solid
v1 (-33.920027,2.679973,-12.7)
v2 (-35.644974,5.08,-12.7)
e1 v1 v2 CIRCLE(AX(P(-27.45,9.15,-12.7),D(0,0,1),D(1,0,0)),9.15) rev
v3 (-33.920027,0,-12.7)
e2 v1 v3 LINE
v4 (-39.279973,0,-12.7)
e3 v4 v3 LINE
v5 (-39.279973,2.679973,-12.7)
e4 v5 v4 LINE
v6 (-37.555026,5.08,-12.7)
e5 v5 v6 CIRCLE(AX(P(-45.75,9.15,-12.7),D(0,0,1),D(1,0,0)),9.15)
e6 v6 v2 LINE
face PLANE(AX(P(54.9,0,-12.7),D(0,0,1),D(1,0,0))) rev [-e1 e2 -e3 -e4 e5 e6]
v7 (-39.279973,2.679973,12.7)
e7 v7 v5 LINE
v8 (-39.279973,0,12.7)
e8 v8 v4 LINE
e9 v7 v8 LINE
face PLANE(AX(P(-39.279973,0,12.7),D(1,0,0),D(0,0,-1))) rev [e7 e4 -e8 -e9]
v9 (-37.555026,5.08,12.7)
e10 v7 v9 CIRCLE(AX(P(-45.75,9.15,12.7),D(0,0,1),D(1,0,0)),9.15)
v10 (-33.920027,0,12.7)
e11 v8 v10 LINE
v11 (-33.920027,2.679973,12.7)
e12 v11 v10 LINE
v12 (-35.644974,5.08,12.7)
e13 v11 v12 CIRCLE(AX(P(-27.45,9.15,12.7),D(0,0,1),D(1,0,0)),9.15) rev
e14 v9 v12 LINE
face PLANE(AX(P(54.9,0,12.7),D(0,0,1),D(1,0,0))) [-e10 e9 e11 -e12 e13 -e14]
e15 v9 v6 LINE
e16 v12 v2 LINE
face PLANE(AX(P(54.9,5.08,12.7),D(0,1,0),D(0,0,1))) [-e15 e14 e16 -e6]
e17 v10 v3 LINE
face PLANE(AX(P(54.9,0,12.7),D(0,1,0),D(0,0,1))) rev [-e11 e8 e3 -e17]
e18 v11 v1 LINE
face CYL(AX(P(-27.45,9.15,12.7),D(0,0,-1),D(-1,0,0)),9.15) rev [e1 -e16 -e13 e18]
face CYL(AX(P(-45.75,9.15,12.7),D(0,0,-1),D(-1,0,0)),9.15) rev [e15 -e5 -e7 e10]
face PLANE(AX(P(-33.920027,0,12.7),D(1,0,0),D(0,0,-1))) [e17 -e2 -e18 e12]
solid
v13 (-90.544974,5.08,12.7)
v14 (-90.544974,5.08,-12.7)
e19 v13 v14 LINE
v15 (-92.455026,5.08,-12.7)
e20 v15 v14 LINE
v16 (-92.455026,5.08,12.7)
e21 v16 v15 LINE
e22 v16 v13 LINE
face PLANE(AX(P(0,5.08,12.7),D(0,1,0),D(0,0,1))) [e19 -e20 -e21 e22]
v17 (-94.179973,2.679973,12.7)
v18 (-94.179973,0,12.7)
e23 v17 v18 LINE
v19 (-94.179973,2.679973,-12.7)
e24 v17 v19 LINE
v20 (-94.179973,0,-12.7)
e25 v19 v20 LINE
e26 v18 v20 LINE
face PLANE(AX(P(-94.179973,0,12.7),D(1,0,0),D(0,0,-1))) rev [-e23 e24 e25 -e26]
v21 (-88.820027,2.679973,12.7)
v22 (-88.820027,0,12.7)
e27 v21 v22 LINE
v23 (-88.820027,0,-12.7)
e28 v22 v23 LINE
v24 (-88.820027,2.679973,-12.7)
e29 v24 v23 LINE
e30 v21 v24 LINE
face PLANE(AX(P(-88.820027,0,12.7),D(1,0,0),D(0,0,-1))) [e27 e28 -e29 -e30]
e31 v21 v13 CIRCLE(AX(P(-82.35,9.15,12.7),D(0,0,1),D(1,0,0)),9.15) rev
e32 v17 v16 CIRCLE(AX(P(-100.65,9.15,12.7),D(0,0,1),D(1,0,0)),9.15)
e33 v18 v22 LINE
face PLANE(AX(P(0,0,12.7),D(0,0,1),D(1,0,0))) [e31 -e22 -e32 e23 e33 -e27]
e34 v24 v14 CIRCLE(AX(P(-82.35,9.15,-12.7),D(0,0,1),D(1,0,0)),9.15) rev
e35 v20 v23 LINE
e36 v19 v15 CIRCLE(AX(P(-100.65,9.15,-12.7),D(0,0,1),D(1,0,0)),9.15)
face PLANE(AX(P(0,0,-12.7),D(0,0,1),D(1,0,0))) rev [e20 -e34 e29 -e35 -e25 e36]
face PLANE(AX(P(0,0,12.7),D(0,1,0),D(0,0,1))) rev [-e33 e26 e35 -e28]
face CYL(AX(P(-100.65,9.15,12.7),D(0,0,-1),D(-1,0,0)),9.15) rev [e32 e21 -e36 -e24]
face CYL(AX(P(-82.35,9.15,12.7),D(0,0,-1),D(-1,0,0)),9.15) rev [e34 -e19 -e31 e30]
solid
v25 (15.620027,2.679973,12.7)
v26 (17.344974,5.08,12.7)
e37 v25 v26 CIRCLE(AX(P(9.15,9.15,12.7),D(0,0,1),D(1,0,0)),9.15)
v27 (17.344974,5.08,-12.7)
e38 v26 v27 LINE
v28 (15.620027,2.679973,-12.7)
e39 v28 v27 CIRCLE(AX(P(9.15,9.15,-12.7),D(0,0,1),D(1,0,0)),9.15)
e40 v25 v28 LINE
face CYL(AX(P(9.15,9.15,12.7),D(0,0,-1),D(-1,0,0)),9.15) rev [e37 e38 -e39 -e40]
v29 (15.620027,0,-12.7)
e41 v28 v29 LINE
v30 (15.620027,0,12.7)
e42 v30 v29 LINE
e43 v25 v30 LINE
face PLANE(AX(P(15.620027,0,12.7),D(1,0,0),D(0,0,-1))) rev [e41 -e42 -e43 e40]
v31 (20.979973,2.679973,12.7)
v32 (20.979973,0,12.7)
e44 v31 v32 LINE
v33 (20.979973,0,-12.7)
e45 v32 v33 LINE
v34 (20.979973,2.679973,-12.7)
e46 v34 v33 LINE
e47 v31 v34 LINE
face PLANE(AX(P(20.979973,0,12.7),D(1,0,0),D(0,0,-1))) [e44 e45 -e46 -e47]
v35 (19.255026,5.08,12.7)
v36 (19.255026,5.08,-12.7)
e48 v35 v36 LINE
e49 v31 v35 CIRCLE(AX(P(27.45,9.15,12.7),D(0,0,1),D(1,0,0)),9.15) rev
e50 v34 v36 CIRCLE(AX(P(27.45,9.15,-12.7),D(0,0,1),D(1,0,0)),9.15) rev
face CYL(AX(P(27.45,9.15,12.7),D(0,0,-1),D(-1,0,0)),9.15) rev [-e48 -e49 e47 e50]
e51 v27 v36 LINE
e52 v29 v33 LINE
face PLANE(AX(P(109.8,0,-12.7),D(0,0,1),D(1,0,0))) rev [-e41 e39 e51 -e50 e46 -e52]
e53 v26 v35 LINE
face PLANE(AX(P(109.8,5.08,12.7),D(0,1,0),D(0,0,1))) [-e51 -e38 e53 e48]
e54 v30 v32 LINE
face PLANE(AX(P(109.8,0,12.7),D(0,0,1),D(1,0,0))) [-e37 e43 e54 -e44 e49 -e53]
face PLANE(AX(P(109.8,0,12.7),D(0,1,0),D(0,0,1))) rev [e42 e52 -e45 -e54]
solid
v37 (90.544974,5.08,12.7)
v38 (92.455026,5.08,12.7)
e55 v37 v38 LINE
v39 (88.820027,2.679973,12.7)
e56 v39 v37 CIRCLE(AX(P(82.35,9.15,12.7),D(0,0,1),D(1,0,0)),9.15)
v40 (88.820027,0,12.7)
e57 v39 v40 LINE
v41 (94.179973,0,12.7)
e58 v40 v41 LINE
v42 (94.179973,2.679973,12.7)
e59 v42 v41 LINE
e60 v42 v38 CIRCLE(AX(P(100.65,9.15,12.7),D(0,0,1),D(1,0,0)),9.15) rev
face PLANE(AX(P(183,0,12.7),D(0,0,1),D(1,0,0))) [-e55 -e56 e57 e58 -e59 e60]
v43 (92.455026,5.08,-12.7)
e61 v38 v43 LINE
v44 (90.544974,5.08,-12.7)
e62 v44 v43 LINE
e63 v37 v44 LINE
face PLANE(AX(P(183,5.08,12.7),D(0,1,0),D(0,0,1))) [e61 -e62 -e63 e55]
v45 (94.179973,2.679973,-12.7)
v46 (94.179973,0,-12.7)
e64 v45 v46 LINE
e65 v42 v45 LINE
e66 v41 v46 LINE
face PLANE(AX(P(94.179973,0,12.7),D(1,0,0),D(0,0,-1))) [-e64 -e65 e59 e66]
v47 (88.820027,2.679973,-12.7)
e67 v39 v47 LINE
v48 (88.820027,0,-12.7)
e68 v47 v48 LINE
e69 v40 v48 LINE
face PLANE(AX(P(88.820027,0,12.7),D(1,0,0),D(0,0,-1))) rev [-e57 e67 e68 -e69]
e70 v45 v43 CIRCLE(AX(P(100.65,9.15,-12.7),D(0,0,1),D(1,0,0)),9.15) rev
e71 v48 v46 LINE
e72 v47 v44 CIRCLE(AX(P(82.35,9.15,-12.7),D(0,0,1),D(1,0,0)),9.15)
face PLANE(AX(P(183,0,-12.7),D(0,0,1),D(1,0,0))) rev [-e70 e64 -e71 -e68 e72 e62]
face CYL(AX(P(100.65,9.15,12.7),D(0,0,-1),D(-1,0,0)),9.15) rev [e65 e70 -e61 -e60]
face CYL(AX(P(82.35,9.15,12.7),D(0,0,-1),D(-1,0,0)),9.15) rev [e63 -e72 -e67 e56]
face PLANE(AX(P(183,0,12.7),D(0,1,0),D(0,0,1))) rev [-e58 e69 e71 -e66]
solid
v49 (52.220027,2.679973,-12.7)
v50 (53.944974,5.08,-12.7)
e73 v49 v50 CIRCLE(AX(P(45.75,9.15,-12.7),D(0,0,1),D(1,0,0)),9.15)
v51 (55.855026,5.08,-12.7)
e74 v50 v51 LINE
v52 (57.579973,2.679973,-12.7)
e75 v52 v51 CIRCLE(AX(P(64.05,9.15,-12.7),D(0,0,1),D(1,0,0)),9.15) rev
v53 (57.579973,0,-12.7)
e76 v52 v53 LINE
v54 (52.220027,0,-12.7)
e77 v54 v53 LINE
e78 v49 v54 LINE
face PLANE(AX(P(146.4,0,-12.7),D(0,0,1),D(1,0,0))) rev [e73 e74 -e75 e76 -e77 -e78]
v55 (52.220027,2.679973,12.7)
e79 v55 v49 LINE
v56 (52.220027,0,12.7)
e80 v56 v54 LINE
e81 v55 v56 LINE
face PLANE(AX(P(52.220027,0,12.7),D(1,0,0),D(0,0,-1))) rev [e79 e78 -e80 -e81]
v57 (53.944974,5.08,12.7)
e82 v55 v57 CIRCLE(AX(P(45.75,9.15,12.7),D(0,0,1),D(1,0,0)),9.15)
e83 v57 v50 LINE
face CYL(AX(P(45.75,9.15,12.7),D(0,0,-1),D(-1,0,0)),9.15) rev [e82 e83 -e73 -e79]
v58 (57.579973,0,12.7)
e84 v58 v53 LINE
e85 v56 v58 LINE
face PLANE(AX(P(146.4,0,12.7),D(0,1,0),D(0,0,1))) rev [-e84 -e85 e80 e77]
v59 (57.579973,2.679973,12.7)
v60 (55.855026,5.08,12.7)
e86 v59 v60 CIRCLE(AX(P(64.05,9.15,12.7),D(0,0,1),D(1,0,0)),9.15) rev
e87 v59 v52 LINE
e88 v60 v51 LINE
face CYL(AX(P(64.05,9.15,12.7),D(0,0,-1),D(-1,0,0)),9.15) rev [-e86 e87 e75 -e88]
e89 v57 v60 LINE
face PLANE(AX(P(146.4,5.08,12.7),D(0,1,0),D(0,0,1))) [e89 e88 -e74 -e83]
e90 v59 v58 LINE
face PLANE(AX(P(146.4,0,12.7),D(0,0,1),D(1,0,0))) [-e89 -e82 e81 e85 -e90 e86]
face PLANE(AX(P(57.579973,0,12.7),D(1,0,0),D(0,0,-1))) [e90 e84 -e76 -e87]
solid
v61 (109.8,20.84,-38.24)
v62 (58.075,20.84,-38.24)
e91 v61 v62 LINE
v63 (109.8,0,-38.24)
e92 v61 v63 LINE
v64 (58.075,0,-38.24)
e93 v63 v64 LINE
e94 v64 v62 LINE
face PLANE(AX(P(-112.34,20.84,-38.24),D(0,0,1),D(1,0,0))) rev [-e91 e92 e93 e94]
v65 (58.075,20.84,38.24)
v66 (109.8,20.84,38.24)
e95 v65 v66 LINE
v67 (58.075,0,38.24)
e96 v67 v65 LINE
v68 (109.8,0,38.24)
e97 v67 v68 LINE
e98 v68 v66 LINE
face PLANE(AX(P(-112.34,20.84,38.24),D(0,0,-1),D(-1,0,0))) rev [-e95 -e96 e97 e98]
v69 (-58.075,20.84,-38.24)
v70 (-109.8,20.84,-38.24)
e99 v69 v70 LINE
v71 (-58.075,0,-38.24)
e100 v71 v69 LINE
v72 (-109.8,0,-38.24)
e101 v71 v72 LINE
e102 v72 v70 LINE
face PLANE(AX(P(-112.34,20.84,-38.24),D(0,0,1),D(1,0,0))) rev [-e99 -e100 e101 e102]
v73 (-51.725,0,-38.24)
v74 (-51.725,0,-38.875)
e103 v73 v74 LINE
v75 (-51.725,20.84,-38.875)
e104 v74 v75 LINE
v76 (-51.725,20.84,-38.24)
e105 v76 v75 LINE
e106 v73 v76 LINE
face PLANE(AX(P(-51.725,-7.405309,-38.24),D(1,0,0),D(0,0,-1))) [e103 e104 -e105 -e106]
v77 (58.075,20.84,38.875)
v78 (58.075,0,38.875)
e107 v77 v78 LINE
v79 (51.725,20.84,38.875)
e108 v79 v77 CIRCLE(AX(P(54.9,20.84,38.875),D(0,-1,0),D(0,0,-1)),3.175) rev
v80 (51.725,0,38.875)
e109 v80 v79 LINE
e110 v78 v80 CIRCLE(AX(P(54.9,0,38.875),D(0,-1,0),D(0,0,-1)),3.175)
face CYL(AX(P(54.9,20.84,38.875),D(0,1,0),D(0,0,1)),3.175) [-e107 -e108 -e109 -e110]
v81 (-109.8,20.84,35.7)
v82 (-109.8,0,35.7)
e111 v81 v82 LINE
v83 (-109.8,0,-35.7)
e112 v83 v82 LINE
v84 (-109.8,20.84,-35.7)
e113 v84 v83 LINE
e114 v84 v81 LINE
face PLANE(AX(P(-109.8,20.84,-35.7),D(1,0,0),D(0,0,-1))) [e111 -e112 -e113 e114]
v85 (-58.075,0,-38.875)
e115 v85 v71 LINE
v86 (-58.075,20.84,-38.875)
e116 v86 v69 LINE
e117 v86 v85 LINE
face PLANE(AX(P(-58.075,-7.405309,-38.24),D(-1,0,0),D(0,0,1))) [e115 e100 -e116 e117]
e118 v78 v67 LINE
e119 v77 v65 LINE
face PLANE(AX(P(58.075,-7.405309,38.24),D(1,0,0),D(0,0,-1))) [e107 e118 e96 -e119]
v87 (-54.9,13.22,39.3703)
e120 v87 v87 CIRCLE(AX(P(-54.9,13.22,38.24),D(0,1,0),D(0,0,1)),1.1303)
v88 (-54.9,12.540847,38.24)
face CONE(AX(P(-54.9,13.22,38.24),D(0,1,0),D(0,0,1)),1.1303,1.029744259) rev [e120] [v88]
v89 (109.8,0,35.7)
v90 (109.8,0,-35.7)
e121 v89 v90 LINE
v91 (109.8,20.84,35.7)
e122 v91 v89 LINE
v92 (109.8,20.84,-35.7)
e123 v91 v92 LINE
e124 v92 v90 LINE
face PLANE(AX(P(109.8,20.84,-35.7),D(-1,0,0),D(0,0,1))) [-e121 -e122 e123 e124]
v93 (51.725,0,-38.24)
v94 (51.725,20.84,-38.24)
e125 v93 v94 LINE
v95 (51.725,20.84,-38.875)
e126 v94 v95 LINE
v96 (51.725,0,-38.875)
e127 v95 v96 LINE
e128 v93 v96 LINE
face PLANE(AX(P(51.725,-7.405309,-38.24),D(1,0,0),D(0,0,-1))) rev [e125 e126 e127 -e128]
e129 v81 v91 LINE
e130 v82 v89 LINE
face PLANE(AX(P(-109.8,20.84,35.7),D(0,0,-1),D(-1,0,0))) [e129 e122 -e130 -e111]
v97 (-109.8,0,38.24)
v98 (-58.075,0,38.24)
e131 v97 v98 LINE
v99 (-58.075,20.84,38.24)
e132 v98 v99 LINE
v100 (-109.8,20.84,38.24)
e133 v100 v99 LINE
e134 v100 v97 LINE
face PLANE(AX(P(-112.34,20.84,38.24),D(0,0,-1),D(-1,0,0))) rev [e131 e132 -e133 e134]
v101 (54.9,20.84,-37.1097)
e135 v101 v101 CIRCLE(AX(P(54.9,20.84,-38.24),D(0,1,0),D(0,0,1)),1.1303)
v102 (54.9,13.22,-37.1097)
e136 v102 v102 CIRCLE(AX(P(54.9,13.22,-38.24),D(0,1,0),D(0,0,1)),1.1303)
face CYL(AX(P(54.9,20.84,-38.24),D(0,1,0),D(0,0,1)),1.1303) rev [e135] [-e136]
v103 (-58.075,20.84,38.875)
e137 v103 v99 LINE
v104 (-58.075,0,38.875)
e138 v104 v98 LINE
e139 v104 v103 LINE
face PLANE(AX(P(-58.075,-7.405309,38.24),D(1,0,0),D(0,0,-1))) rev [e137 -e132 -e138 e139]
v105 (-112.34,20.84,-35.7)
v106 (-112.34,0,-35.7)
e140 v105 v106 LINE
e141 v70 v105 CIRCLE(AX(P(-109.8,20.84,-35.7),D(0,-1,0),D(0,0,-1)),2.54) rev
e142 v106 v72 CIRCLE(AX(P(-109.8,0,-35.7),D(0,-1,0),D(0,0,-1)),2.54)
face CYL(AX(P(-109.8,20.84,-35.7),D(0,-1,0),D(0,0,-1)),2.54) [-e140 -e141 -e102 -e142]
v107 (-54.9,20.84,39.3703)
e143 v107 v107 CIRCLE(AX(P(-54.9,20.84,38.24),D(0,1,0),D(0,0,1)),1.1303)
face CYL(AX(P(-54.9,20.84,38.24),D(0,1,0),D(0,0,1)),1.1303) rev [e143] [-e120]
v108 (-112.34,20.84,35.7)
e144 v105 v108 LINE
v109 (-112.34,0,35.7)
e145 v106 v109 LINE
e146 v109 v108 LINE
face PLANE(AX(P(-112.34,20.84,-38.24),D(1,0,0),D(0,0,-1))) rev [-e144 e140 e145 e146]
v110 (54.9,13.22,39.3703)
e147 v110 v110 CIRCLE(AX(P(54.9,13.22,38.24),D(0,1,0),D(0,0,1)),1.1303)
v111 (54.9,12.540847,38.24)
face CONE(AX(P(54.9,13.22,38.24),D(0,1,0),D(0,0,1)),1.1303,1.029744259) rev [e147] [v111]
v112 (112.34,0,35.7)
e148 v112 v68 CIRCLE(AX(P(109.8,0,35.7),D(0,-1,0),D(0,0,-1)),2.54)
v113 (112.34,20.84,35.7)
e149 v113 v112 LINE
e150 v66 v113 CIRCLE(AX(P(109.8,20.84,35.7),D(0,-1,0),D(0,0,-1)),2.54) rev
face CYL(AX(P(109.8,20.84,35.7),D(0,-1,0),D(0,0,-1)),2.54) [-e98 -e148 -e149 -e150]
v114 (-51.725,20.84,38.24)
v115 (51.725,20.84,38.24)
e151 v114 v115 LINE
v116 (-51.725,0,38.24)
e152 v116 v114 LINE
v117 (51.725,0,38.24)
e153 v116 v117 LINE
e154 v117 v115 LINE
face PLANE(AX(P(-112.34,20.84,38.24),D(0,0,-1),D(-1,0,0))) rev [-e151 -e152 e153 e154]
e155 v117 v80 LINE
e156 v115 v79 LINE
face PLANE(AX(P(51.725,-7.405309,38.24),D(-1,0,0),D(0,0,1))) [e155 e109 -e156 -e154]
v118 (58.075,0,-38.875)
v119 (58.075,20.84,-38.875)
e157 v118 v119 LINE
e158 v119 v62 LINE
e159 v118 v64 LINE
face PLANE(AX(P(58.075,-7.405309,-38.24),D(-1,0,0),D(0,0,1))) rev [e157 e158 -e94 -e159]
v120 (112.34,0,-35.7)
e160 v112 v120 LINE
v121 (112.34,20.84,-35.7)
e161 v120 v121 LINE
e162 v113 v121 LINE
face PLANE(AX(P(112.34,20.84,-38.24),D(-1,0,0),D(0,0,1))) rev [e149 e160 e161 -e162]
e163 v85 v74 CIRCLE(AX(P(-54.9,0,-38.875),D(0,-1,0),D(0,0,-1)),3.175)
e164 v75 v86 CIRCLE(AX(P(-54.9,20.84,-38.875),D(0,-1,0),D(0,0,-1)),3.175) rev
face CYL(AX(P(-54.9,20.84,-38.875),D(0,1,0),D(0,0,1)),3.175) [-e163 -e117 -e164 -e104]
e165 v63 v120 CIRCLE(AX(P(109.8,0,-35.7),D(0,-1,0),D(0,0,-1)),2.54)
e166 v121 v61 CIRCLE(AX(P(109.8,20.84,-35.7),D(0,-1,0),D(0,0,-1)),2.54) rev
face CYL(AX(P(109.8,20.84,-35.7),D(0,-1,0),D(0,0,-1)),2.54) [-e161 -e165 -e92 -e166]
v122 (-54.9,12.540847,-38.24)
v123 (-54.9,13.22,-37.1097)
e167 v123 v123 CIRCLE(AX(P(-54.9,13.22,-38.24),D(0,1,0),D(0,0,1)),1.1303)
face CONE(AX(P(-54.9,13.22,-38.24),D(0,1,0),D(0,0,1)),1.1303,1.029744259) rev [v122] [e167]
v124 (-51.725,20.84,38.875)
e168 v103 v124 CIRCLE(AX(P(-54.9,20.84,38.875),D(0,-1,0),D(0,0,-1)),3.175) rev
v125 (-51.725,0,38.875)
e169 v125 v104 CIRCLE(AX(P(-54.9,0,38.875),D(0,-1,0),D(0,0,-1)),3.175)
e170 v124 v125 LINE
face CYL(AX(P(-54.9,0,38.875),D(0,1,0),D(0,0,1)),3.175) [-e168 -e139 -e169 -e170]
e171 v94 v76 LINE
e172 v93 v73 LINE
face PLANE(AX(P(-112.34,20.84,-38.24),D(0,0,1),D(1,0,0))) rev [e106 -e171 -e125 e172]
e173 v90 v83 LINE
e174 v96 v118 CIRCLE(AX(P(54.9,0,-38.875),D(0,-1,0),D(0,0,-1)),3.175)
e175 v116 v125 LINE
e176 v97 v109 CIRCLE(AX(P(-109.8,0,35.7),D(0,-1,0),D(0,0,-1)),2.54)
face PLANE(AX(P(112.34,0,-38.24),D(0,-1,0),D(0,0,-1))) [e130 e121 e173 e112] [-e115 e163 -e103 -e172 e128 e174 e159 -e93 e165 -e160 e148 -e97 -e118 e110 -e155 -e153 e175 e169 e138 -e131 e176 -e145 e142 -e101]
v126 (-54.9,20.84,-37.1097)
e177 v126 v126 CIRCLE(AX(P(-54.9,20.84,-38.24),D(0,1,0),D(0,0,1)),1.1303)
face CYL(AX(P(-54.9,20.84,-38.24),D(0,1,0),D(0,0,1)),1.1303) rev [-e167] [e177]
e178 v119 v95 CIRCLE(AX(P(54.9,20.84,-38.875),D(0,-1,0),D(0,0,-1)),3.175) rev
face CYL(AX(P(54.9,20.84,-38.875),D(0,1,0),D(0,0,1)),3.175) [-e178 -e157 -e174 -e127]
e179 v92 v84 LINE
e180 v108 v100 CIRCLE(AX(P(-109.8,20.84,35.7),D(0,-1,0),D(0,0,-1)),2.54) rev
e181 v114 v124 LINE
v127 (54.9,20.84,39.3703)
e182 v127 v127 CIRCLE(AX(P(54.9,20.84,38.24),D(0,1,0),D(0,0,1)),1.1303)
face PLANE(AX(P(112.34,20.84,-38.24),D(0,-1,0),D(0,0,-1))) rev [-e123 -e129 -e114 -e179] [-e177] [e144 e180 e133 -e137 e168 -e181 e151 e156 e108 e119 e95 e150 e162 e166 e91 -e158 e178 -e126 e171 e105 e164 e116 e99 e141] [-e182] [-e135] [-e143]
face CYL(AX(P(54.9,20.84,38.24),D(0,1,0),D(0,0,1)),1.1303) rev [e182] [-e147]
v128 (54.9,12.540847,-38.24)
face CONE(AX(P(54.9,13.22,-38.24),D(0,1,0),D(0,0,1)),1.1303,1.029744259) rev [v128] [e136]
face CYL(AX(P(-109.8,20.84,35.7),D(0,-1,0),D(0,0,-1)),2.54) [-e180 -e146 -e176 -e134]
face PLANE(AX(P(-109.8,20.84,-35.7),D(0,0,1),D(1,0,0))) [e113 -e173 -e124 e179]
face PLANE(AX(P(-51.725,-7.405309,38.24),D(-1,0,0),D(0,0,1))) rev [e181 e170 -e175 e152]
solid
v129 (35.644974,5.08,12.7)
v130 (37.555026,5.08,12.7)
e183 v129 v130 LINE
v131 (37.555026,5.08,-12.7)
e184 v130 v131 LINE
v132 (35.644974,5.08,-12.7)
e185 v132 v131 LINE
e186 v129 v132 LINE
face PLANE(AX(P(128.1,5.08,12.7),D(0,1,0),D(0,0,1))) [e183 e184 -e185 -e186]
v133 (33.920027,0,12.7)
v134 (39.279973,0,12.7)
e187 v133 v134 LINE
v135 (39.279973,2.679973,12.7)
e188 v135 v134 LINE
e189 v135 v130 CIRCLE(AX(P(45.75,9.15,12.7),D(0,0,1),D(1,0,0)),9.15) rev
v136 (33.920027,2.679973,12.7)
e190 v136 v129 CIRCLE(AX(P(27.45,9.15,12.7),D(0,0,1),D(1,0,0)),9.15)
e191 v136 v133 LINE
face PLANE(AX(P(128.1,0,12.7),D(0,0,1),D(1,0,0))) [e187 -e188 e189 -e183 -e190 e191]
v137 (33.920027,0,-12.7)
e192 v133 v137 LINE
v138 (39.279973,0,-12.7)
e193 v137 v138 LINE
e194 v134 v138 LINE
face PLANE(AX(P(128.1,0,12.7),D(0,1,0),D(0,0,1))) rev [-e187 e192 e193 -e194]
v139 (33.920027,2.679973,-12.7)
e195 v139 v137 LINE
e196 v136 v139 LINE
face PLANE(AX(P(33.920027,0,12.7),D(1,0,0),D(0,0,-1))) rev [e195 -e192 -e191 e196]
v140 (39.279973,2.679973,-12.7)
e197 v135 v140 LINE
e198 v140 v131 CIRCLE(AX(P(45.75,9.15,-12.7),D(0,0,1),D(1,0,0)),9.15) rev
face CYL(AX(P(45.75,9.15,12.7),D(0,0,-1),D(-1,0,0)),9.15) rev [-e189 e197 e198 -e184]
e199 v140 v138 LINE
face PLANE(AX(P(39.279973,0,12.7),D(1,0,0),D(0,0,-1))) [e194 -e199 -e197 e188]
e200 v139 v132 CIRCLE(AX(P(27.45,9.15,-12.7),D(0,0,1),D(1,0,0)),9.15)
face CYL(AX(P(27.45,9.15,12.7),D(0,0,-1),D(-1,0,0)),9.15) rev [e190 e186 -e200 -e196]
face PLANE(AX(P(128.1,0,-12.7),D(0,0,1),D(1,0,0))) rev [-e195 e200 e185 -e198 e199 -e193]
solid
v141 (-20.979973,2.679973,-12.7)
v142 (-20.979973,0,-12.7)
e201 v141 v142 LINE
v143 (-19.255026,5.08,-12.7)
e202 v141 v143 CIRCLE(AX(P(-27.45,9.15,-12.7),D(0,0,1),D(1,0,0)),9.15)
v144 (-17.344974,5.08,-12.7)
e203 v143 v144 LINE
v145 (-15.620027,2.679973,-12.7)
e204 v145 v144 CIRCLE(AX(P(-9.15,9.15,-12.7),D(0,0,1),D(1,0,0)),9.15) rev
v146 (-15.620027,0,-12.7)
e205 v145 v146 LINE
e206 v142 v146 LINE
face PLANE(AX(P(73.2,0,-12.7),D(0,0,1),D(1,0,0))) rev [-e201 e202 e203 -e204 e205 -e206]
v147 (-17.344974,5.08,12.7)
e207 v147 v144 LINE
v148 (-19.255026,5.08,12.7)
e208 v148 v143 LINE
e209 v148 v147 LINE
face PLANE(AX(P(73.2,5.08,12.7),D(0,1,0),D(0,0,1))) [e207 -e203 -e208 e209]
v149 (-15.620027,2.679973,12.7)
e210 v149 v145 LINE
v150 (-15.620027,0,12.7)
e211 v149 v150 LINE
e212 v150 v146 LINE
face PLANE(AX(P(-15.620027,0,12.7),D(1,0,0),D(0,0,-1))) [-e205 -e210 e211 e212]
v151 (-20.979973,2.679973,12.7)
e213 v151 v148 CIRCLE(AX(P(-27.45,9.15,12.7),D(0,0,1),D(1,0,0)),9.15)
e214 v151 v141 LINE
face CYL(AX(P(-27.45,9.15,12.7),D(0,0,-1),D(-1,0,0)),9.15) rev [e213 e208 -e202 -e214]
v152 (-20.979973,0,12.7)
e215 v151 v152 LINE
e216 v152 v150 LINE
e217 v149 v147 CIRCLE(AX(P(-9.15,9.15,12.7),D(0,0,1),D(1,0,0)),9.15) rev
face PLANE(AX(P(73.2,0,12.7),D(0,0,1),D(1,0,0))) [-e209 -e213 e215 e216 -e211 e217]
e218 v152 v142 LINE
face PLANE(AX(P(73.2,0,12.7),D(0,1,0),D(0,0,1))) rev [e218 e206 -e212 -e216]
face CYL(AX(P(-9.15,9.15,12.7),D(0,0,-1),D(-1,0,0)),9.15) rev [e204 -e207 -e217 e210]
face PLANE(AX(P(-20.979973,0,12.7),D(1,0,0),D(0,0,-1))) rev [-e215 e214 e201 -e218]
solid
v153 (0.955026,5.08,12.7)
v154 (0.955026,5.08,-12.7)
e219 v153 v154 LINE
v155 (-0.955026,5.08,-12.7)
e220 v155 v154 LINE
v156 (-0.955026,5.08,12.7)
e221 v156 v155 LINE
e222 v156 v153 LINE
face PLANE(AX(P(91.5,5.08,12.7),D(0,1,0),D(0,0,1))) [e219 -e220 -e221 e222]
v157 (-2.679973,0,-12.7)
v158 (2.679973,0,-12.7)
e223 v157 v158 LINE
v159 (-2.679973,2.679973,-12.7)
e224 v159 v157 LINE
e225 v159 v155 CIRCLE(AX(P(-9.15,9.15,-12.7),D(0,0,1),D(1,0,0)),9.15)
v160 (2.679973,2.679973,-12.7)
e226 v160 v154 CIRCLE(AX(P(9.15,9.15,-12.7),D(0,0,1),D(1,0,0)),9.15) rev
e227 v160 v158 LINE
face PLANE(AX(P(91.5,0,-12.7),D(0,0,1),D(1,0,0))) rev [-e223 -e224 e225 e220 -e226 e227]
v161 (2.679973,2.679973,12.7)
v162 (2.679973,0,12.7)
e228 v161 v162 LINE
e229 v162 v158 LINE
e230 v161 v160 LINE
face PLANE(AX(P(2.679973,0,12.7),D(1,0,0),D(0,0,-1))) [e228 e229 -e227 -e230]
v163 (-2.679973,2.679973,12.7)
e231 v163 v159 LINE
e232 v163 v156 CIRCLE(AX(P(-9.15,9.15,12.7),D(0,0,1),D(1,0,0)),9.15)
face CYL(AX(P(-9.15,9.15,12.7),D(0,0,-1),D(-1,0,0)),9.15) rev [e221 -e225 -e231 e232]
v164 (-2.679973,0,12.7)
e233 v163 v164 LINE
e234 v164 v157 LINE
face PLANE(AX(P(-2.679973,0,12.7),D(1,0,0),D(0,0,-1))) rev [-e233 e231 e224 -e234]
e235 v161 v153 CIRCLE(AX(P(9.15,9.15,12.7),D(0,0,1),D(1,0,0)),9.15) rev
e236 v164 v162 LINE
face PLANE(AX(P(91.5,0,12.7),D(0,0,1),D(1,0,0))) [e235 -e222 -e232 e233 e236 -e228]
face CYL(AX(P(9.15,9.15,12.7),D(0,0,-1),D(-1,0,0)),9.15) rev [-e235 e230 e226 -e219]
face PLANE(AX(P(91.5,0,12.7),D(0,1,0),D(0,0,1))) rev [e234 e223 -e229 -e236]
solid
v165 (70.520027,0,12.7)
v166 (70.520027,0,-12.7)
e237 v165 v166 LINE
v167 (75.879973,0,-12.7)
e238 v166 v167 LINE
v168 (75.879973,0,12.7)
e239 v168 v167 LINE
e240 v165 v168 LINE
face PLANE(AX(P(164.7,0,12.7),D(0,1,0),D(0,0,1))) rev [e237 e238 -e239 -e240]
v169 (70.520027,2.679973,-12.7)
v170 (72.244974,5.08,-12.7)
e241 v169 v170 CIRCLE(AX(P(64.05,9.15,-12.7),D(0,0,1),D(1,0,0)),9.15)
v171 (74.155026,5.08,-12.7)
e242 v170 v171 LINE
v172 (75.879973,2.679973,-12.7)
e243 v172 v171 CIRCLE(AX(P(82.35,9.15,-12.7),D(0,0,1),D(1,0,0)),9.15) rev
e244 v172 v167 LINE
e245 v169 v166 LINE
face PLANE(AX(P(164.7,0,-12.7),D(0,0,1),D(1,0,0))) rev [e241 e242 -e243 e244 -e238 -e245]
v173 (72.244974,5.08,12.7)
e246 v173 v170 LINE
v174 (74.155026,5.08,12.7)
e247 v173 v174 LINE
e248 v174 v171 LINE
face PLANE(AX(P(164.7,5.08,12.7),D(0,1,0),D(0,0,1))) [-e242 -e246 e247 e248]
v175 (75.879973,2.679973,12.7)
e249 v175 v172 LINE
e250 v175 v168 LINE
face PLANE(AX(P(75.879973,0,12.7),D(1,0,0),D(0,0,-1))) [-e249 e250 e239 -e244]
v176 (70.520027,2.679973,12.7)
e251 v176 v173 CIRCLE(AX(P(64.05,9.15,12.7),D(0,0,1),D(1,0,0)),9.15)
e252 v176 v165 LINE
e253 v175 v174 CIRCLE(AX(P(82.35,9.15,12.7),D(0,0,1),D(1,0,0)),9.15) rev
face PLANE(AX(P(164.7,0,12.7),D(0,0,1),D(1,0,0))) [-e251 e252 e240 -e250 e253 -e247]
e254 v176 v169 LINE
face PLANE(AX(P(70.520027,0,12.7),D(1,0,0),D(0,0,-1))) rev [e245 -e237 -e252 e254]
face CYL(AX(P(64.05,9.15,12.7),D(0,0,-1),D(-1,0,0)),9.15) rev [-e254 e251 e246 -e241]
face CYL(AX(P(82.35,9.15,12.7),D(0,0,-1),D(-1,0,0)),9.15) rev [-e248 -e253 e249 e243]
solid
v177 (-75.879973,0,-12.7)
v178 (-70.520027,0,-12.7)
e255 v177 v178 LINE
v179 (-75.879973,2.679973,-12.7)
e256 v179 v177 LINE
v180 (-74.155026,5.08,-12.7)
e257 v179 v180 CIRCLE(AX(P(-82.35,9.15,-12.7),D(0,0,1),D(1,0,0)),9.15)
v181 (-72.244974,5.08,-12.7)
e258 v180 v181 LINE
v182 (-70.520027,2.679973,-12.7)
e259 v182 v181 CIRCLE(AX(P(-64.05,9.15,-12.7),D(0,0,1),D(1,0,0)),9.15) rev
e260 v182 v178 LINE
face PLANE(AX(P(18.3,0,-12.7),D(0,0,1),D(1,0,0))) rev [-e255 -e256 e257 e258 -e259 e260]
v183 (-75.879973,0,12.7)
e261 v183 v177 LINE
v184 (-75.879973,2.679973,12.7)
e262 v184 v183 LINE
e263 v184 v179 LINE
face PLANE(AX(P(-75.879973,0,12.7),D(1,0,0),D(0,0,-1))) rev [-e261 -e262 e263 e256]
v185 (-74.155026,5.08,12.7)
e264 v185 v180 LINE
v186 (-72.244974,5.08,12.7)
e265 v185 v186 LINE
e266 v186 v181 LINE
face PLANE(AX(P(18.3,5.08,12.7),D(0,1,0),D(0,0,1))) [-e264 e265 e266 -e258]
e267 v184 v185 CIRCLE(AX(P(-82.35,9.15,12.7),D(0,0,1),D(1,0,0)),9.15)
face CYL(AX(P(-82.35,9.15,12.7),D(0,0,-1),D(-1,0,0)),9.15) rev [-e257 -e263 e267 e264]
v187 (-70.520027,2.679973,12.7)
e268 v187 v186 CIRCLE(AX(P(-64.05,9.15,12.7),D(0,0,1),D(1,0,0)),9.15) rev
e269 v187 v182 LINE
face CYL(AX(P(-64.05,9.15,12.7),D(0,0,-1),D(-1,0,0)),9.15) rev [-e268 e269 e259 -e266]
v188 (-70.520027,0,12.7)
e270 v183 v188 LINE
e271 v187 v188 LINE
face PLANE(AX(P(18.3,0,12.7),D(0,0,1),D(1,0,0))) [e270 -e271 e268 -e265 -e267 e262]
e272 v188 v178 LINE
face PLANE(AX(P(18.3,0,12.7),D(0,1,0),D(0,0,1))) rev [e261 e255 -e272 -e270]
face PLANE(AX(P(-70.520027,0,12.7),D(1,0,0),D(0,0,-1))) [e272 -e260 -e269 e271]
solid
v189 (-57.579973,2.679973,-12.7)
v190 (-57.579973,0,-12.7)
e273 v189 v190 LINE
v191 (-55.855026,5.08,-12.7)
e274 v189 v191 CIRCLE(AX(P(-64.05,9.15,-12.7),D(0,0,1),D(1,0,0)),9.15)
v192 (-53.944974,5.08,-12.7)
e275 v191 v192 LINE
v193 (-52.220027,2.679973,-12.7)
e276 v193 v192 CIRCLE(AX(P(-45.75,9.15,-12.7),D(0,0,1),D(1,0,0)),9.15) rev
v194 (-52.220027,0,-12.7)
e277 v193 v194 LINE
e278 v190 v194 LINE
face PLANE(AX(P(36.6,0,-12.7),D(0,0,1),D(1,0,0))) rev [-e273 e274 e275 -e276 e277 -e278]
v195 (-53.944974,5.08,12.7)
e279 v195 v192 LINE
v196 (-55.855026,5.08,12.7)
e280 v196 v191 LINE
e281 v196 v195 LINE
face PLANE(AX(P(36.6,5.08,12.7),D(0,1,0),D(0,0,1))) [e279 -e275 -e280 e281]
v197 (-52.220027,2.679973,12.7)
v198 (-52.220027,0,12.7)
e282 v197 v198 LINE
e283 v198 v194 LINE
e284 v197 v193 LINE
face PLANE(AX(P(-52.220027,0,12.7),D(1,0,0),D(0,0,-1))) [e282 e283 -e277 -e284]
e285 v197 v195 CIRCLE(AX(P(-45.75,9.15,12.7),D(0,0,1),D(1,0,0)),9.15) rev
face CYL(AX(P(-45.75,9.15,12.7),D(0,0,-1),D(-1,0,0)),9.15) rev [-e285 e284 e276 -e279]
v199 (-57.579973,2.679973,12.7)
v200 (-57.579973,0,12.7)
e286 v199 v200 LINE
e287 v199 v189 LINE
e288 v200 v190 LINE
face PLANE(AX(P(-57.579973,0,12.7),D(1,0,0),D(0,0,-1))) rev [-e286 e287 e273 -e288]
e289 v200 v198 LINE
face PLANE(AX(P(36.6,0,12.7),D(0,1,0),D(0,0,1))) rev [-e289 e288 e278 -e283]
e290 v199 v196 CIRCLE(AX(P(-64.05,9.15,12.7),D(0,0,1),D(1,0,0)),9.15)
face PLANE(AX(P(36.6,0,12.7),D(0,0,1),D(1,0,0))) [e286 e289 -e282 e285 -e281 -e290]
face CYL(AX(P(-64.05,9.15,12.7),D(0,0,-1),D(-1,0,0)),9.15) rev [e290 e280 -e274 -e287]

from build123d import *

# Parameters (mm, degrees)
BOSS_EXTRUDE1_OUTLINE_W        = 224.68
BOSS_EXTRUDE1_OUTLINE_H        = 76.48
BOSS_EXTRUDE1_OUTLINE_W_2      = 219.6
BOSS_EXTRUDE1_OUTLINE_H_2      = 71.4
BOSS_EXTRUDE1_DEPTH            = 20.839999976
BOSS_EXTRUDE2_DEPTH            = 12.7
LPATTERN2_COUNT                = 11
LPATTERN2_PITCH                = 18.3
SKETCH6_W                      = 6.35
SKETCH6_H                      = 3.81
BOSS_EXTRUDE3_DEPTH            = 20.839999976
MIRROR2_COPY_1_SKETCH_W        = 6.35
MIRROR2_COPY_1_SKETCH_H        = 3.81
MIRROR2_COPY_1_DEPTH           = 20.839999976
F_4_40_TAPPED_HOLE1_AT_2_COUNT = 2
F_4_40_TAPPED_HOLE1_AT_2_PITCH = 109.8
F_4_40_TAPPED_HOLE1_AT_3_COUNT = 2
F_4_40_TAPPED_HOLE1_AT_3_PITCH = 133.810427097
F_4_40_TAPPED_HOLE1_AT_4_COUNT = 2
F_4_40_TAPPED_HOLE1_AT_4_PITCH = 76.48
FILLET1_RADIUS                 = 3.175
FILLET1_LENGTH                 = 20.839999976
FILLET2_RADIUS                 = 3.175
FILLET2_LENGTH                 = 20.839999976
FILLET3_RADIUS                 = 3.175
FILLET3_LENGTH                 = 20.839999976
FILLET4_RADIUS                 = 3.175
FILLET4_LENGTH                 = 20.839999976
FILLET5_R                      = 2.54


# Read off the part's stored shape, not the designer's step: Boss-Extrude1
with BuildPart() as part:
    # Boss-Extrude1 outline → Boss-Extrude1 (new body)
    with BuildSketch(Plane(origin=(0, 0, 0), x_dir=(1, 0, 0), z_dir=(0, 1, 0))):
        Rectangle(BOSS_EXTRUDE1_OUTLINE_W, BOSS_EXTRUDE1_OUTLINE_H)
        Rectangle(BOSS_EXTRUDE1_OUTLINE_W_2, BOSS_EXTRUDE1_OUTLINE_H_2, mode=Mode.SUBTRACT)
    extrude(amount=BOSS_EXTRUDE1_DEPTH)

    # Sketch6 → Boss-Extrude3 (add)
    with BuildSketch(Plane(origin=(0, 20.839999976, 0), x_dir=(1, 0, 0), z_dir=(0, 1, 0))):
        with Locations((-54.9, 40.145)):
            Rectangle(SKETCH6_W, SKETCH6_H)
    boss_extrude3 = extrude(amount=-BOSS_EXTRUDE3_DEPTH)

    # Mirror1: Boss-Extrude3 across plane
    add(boss_extrude3.mirror(Plane(origin=(0, 0, 0), x_dir=(0, 0, 1), z_dir=(1, 0, 0))))

    # Mirror2: Boss-Extrude3 across plane
    add(boss_extrude3.mirror(Plane.XY))

    # Mirror2 copy 1 sketch → Mirror2 copy 1 (add)
    with BuildSketch(Plane(origin=(0, 20.839999976, 0), x_dir=(-1, 0, 0), z_dir=(0, 1, 0))):
        with Locations((-54.9, 40.145)):
            Rectangle(MIRROR2_COPY_1_SKETCH_W, MIRROR2_COPY_1_SKETCH_H)
    extrude(amount=-MIRROR2_COPY_1_DEPTH)

    # Sketch7 → #4-40 Tapped Hole1 (revolve, cut)
    with BuildSketch(Plane(origin=(-54.9, 20.839999976, -38.24), x_dir=(0, 0, 1), z_dir=(1, 0, 0))):
        Polygon((0, 0), (0, 8.299152758), (1.1303, 7.62), (1.1303, 0), align=None)
    f_4_40_tapped_hole1 = revolve(axis=Axis((-54.9, 27.189999976, -38.24), (0, -1, 0)), mode=Mode.SUBTRACT)

    # #4-40 Tapped Hole1 at 2: #4-40 Tapped Hole1 ×2
    with Locations(*[(i * F_4_40_TAPPED_HOLE1_AT_2_PITCH, 0, 0) for i in range(1, F_4_40_TAPPED_HOLE1_AT_2_COUNT)]):
        add(f_4_40_tapped_hole1, mode=Mode.SUBTRACT)

    # #4-40 Tapped Hole1 at 3: #4-40 Tapped Hole1 ×2
    with Locations(*[Vector(0.8205638557602251, 0, 0.5715548605513844) * (i * F_4_40_TAPPED_HOLE1_AT_3_PITCH) for i in range(1, F_4_40_TAPPED_HOLE1_AT_3_COUNT)]):
        add(f_4_40_tapped_hole1, mode=Mode.SUBTRACT)

    # #4-40 Tapped Hole1 at 4: #4-40 Tapped Hole1 ×2
    with Locations(*[(0, 0, i * F_4_40_TAPPED_HOLE1_AT_4_PITCH) for i in range(1, F_4_40_TAPPED_HOLE1_AT_4_COUNT)]):
        add(f_4_40_tapped_hole1, mode=Mode.SUBTRACT)

    # Fillet1: full round fillet: the end face becomes a half cylinder, R = half its width
    fillet1_face = Plane((-54.9, 10.419999988, -42.05), x_dir=(0, -1, 0), z_dir=(0, 0, -1))  # on the end face: x along it, z out of the body
    fillet1_slab = fillet1_face.offset(-FILLET1_RADIUS / 2) * Box(FILLET1_LENGTH, 2 * FILLET1_RADIUS, FILLET1_RADIUS, mode=Mode.PRIVATE)  # the body's end, R deep
    fillet1_round = Plane((-54.9, 10.419999988, -38.875), x_dir=(0, 0, -1), z_dir=(0, -1, 0)) * Cylinder(FILLET1_RADIUS, FILLET1_LENGTH, mode=Mode.PRIVATE)  # its axis R under the face
    add(fillet1_slab - fillet1_round, mode=Mode.SUBTRACT)

    # Fillet2: full round fillet: the end face becomes a half cylinder, R = half its width
    fillet2_face = Plane((54.9, 10.419999988, -42.05), x_dir=(0, -1, 0), z_dir=(0, 0, -1))  # on the end face: x along it, z out of the body
    fillet2_slab = fillet2_face.offset(-FILLET2_RADIUS / 2) * Box(FILLET2_LENGTH, 2 * FILLET2_RADIUS, FILLET2_RADIUS, mode=Mode.PRIVATE)  # the body's end, R deep
    fillet2_round = Plane((54.9, 10.419999988, -38.875), x_dir=(0, 0, -1), z_dir=(0, -1, 0)) * Cylinder(FILLET2_RADIUS, FILLET2_LENGTH, mode=Mode.PRIVATE)  # its axis R under the face
    add(fillet2_slab - fillet2_round, mode=Mode.SUBTRACT)

    # Fillet3: full round fillet: the end face becomes a half cylinder, R = half its width
    fillet3_face = Plane((54.9, 10.419999988, 42.05), x_dir=(0, -1, 0), z_dir=(0, 0, 1))  # on the end face: x along it, z out of the body
    fillet3_slab = fillet3_face.offset(-FILLET3_RADIUS / 2) * Box(FILLET3_LENGTH, 2 * FILLET3_RADIUS, FILLET3_RADIUS, mode=Mode.PRIVATE)  # the body's end, R deep
    fillet3_round = Plane((54.9, 10.419999988, 38.875), x_dir=(0, 0, 1), z_dir=(0, -1, 0)) * Cylinder(FILLET3_RADIUS, FILLET3_LENGTH, mode=Mode.PRIVATE)  # its axis R under the face
    add(fillet3_slab - fillet3_round, mode=Mode.SUBTRACT)

    # Fillet4: full round fillet: the end face becomes a half cylinder, R = half its width
    fillet4_face = Plane((-54.9, 10.419999988, 42.05), x_dir=(0, -1, 0), z_dir=(0, 0, 1))  # on the end face: x along it, z out of the body
    fillet4_slab = fillet4_face.offset(-FILLET4_RADIUS / 2) * Box(FILLET4_LENGTH, 2 * FILLET4_RADIUS, FILLET4_RADIUS, mode=Mode.PRIVATE)  # the body's end, R deep
    fillet4_round = Plane((-54.9, 10.419999988, 38.875), x_dir=(0, 0, 1), z_dir=(0, -1, 0)) * Cylinder(FILLET4_RADIUS, FILLET4_LENGTH, mode=Mode.PRIVATE)  # its axis R under the face
    add(fillet4_slab - fillet4_round, mode=Mode.SUBTRACT)

    # Fillet5
    fillet5_edges = [part.edges().sort_by_distance(p)[0] for p in [
        (112.34, 10.419999988, 38.24),
        (112.34, 10.419999988, -38.24),
        (-112.34, 10.419999988, -38.24),
        (-112.34, 10.419999988, 38.24),
    ]]
    fillet(fillet5_edges, radius=FILLET5_R)


with BuildPart() as body_2:
    # Sketch4 → Boss-Extrude2 (new, symmetric)
    with BuildSketch(Plane.XY):
        with BuildLine():
            Line((-94.179972952, 0), (-88.820027048, 0))
            Line((-88.820027048, 0), (-88.820027048, 2.679972952))
            ThreePointArc((-88.820027048, 2.679972952), (-89.780046898, 3.809877988), (-90.54497407, 5.08))
            Line((-90.54497407, 5.08), (-92.45502593, 5.08))
            ThreePointArc((-92.45502593, 5.08), (-93.219953102, 3.809877988), (-94.179972952, 2.679972952))
            Line((-94.179972952, 2.679972952), (-94.179972952, 0))
        make_face()
    extrude(amount=BOSS_EXTRUDE2_DEPTH, both=True)


with BuildPart() as lpattern2_1:
    # LPattern2: pattern copy
    add(body_2.part.moved(Location(Vector(1, 0, 0) * (1 * LPATTERN2_PITCH))))


with BuildPart() as lpattern2_2:
    # LPattern2: pattern copy
    add(body_2.part.moved(Location(Vector(1, 0, 0) * (2 * LPATTERN2_PITCH))))


with BuildPart() as lpattern2_3:
    # LPattern2: pattern copy
    add(body_2.part.moved(Location(Vector(1, 0, 0) * (3 * LPATTERN2_PITCH))))


with BuildPart() as lpattern2_4:
    # LPattern2: pattern copy
    add(body_2.part.moved(Location(Vector(1, 0, 0) * (4 * LPATTERN2_PITCH))))


with BuildPart() as lpattern2_5:
    # LPattern2: pattern copy
    add(body_2.part.moved(Location(Vector(1, 0, 0) * (5 * LPATTERN2_PITCH))))


with BuildPart() as lpattern2_6:
    # LPattern2: pattern copy
    add(body_2.part.moved(Location(Vector(1, 0, 0) * (6 * LPATTERN2_PITCH))))


with BuildPart() as lpattern2_7:
    # LPattern2: pattern copy
    add(body_2.part.moved(Location(Vector(1, 0, 0) * (7 * LPATTERN2_PITCH))))


with BuildPart() as lpattern2_8:
    # LPattern2: pattern copy
    add(body_2.part.moved(Location(Vector(1, 0, 0) * (8 * LPATTERN2_PITCH))))


with BuildPart() as lpattern2_9:
    # LPattern2: pattern copy
    add(body_2.part.moved(Location(Vector(1, 0, 0) * (9 * LPATTERN2_PITCH))))


with BuildPart() as lpattern2_10:
    # LPattern2: pattern copy
    add(body_2.part.moved(Location(Vector(1, 0, 0) * (10 * LPATTERN2_PITCH))))


solid = Compound([part.part, body_2.part, lpattern2_1.part, lpattern2_2.part, lpattern2_3.part, lpattern2_4.part, lpattern2_5.part, lpattern2_6.part, lpattern2_7.part, lpattern2_8.part, lpattern2_9.part, lpattern2_10.part])
